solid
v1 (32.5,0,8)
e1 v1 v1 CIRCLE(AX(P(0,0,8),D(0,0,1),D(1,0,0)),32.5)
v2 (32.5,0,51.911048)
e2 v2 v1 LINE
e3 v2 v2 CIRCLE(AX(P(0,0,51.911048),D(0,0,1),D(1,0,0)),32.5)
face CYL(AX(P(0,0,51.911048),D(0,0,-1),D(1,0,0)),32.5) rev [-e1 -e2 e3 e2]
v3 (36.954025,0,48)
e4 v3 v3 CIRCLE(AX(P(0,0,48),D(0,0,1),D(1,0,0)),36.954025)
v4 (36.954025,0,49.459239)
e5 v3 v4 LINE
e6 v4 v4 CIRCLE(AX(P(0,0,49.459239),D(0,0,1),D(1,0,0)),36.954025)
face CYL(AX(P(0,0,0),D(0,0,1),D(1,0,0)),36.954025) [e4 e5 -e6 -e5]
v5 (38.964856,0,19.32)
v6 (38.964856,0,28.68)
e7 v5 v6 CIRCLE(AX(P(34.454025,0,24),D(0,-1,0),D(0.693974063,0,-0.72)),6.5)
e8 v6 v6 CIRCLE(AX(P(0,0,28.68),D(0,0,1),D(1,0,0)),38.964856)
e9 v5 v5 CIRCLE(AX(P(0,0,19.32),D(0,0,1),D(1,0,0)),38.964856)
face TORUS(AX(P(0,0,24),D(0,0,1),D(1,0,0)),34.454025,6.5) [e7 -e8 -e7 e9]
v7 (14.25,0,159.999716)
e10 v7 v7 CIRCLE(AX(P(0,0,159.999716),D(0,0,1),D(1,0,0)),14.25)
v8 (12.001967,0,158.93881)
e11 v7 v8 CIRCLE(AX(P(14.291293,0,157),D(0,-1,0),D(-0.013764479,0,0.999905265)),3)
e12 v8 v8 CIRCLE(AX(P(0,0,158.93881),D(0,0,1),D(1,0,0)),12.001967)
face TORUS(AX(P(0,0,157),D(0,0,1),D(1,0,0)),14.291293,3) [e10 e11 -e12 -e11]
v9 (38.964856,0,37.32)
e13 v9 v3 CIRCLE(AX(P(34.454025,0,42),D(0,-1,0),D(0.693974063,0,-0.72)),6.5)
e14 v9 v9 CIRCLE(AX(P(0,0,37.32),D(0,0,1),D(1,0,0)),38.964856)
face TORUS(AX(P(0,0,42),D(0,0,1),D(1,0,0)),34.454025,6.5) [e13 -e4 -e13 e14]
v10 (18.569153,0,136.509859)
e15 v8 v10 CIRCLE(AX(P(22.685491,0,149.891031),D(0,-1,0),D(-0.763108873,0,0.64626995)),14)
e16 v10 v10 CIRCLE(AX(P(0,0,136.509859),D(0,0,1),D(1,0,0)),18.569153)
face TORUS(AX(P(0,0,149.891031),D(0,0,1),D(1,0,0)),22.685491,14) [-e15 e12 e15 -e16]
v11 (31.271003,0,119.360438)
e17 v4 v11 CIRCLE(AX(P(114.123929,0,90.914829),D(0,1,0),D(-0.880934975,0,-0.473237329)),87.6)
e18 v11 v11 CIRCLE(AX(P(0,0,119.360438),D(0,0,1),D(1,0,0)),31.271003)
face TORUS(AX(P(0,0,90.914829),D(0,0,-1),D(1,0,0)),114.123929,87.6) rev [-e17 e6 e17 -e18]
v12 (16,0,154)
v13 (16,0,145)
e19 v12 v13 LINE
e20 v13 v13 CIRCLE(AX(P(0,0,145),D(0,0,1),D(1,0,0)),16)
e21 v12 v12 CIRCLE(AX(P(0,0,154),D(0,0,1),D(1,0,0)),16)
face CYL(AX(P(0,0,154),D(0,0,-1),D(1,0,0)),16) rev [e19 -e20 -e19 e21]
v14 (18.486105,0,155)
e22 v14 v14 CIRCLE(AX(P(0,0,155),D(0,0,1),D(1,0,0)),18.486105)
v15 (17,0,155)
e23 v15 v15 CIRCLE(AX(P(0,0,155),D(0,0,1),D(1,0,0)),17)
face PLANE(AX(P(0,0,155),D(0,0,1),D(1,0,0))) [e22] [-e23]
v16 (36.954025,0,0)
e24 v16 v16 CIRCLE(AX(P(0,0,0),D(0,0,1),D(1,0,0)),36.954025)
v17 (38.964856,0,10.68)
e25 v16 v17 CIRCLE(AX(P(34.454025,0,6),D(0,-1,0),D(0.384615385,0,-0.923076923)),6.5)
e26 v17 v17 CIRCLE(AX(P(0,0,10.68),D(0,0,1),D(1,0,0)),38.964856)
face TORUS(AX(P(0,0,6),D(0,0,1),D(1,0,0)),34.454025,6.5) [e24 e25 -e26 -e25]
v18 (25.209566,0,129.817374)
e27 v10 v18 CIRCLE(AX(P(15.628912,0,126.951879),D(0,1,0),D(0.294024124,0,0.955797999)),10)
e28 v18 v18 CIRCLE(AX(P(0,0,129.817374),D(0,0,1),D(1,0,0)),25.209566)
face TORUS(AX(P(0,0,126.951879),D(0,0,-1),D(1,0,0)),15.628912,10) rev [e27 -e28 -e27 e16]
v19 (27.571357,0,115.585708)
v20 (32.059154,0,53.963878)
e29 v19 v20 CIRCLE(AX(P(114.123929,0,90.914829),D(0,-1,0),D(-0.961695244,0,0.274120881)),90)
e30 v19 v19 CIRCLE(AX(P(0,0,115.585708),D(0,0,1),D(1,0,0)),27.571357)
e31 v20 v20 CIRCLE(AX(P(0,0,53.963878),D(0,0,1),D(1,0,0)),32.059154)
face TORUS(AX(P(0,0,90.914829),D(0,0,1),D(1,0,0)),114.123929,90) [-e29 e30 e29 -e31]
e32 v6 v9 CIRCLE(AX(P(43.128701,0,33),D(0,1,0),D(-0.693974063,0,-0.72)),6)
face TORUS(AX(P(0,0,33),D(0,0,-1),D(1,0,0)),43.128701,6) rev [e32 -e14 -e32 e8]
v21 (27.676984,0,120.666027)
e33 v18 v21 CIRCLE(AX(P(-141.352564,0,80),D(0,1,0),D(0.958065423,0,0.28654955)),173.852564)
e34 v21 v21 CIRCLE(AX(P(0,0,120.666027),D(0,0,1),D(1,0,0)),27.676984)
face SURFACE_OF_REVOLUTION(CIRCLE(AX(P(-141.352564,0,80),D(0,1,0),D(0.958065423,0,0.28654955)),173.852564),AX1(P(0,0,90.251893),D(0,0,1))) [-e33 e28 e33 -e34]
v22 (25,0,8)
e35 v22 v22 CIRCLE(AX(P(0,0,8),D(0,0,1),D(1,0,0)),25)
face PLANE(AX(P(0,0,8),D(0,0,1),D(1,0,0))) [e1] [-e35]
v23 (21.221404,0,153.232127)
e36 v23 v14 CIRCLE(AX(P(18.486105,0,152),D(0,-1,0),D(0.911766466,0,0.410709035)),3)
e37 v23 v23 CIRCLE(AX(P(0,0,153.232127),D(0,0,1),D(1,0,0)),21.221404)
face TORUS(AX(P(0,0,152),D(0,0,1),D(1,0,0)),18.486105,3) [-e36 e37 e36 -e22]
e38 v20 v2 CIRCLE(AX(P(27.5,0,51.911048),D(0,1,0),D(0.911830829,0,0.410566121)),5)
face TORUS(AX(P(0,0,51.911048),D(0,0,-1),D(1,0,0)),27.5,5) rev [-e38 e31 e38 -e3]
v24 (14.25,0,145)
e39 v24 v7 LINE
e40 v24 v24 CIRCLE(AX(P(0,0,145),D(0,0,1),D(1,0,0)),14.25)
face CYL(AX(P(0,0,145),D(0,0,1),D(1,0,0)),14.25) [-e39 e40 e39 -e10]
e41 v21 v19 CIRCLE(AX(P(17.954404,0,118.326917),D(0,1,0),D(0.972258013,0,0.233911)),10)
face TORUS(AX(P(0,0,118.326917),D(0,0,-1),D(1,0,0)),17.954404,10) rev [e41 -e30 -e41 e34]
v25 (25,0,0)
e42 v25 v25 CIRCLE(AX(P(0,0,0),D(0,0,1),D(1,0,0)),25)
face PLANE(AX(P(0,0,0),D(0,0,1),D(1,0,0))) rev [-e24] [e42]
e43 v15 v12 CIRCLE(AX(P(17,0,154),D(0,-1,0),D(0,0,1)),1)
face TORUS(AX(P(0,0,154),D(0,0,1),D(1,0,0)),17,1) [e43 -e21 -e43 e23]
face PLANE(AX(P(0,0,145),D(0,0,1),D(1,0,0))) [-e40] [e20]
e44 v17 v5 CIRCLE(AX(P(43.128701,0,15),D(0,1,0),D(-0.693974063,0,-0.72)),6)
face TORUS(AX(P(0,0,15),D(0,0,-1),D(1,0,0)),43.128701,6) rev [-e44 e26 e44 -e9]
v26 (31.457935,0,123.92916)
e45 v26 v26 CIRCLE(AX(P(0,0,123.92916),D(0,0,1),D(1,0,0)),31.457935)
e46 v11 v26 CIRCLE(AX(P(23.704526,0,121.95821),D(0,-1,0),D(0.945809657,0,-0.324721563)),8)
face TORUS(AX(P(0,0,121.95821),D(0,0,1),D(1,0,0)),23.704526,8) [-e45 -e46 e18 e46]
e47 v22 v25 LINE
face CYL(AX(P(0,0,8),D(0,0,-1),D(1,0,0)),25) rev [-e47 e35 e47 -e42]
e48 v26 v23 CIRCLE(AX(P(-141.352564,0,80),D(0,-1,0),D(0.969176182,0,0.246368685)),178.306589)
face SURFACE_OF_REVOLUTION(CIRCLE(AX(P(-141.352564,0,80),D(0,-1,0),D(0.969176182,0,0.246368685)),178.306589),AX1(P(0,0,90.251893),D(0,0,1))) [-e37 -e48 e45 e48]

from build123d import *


# Not quite as in the source:
# - a feature names something its author has since deleted; it is built from what else it names


with BuildPart() as f1:
    # F0 (on Front) → F1 (revolve)
    with BuildSketch(Plane.XZ):
        with BuildLine():
            Line((25, 8), (25, 0))
            Line((25, 0), (36.9540249121, 0))
            Line((36.9540249121, 0), (36.9540249121, 12))
            Line((36.9540249121, 12), (36.9540249121, 18))
            Line((36.9540249121, 18), (36.9540249121, 30))
            Line((36.9540249121, 30), (36.9540249121, 36))
            Line((36.9540249121, 36), (36.9540249121, 48))
            Line((36.9540249121, 48), (36.9540249121, 49.4592389781))
            ThreePointArc((36.9540249121, 49.4592389781), (26.8120113714, 83.816301877), (31.2710027972, 119.3604378936))
            ThreePointArc((31.2710027972, 119.3604378936), (31.6978375798, 121.63115889), (31.4579349962, 123.9291598748))
            ThreePointArc((31.4579349962, 123.9291598748), (26.978512217, 138.8038130666), (21.2214044341, 153.2321271049))
            ThreePointArc((21.2214044341, 153.2321271049), (20.1145427359, 154.5195616002), (18.486105036, 155))
            Line((18.486105036, 155), (17, 155))
            ThreePointArc((17, 155), (16.2928932188, 154.7071067812), (16, 154))
            Line((16, 154), (16, 145))
            Line((16, 145), (14.25, 145))
            Line((14.25, 145), (14.25, 159.9997157952))
            ThreePointArc((14.25, 159.9997157952), (13.0109310604, 159.7130558752), (12.0019668196, 158.9388098499))
            ThreePointArc((12.0019668196, 158.9388098499), (9.2495897902, 145.9570049241), (18.5691533066, 136.5098585662))
            ThreePointArc((18.5691533066, 136.5098585662), (22.7275417245, 133.9952766931), (25.2095663012, 129.8173740816))
            ThreePointArc((25.2095663012, 129.8173740816), (26.5056514655, 125.2585186607), (27.6769844482, 120.6660271206))
            ThreePointArc((27.6769844482, 120.6660271206), (27.9522435752, 118.1190465704), (27.5713567581, 115.5857083098))
            ThreePointArc((27.5713567581, 115.5857083098), (24.3616600457, 84.3776185226), (32.0591541436, 53.963878112))
            ThreePointArc((32.0591541436, 53.963878112), (32.3885463442, 52.9608639862), (32.5, 51.9110475065))
            Line((32.5, 51.9110475065), (32.5, 8))
            Line((32.5, 8), (25, 8))
        make_face()
        with BuildLine():
            Line((36.9540249121, 12), (36.9540249121, 0))
            ThreePointArc((36.9540249121, 0), (40.8417897216, 4.7973110382), (38.9648563211, 10.68))
            ThreePointArc((38.9648563211, 10.68), (38.0210319574, 11.4338256081), (36.9540249121, 12))
        make_face()
        with BuildLine():
            Line((36.9540249121, 18), (36.9540249121, 12))
            ThreePointArc((36.9540249121, 12), (38.0210319574, 11.4338256081), (38.9648563211, 10.68))
            ThreePointArc((38.9648563211, 10.68), (37.1287006986, 15), (38.9648563211, 19.32))
            ThreePointArc((38.9648563211, 19.32), (38.0210319574, 18.5661743919), (36.9540249121, 18))
        make_face()
        with BuildLine():
            Line((36.9540249121, 30), (36.9540249121, 18))
            ThreePointArc((36.9540249121, 18), (38.0210319574, 18.5661743919), (38.9648563211, 19.32))
            ThreePointArc((38.9648563211, 19.32), (40.9540249121, 24), (38.9648563211, 28.68))
            ThreePointArc((38.9648563211, 28.68), (38.0210319574, 29.4338256081), (36.9540249121, 30))
        make_face()
        with BuildLine():
            Line((36.9540249121, 36), (36.9540249121, 30))
            ThreePointArc((36.9540249121, 30), (38.0210319574, 29.4338256081), (38.9648563211, 28.68))
            ThreePointArc((38.9648563211, 28.68), (37.1287006986, 33), (38.9648563211, 37.32))
            ThreePointArc((38.9648563211, 37.32), (38.0210319574, 36.5661743919), (36.9540249121, 36))
        make_face()
        with BuildLine():
            Line((36.9540249121, 48), (36.9540249121, 36))
            ThreePointArc((36.9540249121, 36), (38.0210319574, 36.5661743919), (38.9648563211, 37.32))
            ThreePointArc((38.9648563211, 37.32), (40.8417897216, 43.2026889618), (36.9540249121, 48))
        make_face()
    revolve(axis=Axis((0, 0, 90.2518928051), (0, 0, 1)))


solid = f1.part
